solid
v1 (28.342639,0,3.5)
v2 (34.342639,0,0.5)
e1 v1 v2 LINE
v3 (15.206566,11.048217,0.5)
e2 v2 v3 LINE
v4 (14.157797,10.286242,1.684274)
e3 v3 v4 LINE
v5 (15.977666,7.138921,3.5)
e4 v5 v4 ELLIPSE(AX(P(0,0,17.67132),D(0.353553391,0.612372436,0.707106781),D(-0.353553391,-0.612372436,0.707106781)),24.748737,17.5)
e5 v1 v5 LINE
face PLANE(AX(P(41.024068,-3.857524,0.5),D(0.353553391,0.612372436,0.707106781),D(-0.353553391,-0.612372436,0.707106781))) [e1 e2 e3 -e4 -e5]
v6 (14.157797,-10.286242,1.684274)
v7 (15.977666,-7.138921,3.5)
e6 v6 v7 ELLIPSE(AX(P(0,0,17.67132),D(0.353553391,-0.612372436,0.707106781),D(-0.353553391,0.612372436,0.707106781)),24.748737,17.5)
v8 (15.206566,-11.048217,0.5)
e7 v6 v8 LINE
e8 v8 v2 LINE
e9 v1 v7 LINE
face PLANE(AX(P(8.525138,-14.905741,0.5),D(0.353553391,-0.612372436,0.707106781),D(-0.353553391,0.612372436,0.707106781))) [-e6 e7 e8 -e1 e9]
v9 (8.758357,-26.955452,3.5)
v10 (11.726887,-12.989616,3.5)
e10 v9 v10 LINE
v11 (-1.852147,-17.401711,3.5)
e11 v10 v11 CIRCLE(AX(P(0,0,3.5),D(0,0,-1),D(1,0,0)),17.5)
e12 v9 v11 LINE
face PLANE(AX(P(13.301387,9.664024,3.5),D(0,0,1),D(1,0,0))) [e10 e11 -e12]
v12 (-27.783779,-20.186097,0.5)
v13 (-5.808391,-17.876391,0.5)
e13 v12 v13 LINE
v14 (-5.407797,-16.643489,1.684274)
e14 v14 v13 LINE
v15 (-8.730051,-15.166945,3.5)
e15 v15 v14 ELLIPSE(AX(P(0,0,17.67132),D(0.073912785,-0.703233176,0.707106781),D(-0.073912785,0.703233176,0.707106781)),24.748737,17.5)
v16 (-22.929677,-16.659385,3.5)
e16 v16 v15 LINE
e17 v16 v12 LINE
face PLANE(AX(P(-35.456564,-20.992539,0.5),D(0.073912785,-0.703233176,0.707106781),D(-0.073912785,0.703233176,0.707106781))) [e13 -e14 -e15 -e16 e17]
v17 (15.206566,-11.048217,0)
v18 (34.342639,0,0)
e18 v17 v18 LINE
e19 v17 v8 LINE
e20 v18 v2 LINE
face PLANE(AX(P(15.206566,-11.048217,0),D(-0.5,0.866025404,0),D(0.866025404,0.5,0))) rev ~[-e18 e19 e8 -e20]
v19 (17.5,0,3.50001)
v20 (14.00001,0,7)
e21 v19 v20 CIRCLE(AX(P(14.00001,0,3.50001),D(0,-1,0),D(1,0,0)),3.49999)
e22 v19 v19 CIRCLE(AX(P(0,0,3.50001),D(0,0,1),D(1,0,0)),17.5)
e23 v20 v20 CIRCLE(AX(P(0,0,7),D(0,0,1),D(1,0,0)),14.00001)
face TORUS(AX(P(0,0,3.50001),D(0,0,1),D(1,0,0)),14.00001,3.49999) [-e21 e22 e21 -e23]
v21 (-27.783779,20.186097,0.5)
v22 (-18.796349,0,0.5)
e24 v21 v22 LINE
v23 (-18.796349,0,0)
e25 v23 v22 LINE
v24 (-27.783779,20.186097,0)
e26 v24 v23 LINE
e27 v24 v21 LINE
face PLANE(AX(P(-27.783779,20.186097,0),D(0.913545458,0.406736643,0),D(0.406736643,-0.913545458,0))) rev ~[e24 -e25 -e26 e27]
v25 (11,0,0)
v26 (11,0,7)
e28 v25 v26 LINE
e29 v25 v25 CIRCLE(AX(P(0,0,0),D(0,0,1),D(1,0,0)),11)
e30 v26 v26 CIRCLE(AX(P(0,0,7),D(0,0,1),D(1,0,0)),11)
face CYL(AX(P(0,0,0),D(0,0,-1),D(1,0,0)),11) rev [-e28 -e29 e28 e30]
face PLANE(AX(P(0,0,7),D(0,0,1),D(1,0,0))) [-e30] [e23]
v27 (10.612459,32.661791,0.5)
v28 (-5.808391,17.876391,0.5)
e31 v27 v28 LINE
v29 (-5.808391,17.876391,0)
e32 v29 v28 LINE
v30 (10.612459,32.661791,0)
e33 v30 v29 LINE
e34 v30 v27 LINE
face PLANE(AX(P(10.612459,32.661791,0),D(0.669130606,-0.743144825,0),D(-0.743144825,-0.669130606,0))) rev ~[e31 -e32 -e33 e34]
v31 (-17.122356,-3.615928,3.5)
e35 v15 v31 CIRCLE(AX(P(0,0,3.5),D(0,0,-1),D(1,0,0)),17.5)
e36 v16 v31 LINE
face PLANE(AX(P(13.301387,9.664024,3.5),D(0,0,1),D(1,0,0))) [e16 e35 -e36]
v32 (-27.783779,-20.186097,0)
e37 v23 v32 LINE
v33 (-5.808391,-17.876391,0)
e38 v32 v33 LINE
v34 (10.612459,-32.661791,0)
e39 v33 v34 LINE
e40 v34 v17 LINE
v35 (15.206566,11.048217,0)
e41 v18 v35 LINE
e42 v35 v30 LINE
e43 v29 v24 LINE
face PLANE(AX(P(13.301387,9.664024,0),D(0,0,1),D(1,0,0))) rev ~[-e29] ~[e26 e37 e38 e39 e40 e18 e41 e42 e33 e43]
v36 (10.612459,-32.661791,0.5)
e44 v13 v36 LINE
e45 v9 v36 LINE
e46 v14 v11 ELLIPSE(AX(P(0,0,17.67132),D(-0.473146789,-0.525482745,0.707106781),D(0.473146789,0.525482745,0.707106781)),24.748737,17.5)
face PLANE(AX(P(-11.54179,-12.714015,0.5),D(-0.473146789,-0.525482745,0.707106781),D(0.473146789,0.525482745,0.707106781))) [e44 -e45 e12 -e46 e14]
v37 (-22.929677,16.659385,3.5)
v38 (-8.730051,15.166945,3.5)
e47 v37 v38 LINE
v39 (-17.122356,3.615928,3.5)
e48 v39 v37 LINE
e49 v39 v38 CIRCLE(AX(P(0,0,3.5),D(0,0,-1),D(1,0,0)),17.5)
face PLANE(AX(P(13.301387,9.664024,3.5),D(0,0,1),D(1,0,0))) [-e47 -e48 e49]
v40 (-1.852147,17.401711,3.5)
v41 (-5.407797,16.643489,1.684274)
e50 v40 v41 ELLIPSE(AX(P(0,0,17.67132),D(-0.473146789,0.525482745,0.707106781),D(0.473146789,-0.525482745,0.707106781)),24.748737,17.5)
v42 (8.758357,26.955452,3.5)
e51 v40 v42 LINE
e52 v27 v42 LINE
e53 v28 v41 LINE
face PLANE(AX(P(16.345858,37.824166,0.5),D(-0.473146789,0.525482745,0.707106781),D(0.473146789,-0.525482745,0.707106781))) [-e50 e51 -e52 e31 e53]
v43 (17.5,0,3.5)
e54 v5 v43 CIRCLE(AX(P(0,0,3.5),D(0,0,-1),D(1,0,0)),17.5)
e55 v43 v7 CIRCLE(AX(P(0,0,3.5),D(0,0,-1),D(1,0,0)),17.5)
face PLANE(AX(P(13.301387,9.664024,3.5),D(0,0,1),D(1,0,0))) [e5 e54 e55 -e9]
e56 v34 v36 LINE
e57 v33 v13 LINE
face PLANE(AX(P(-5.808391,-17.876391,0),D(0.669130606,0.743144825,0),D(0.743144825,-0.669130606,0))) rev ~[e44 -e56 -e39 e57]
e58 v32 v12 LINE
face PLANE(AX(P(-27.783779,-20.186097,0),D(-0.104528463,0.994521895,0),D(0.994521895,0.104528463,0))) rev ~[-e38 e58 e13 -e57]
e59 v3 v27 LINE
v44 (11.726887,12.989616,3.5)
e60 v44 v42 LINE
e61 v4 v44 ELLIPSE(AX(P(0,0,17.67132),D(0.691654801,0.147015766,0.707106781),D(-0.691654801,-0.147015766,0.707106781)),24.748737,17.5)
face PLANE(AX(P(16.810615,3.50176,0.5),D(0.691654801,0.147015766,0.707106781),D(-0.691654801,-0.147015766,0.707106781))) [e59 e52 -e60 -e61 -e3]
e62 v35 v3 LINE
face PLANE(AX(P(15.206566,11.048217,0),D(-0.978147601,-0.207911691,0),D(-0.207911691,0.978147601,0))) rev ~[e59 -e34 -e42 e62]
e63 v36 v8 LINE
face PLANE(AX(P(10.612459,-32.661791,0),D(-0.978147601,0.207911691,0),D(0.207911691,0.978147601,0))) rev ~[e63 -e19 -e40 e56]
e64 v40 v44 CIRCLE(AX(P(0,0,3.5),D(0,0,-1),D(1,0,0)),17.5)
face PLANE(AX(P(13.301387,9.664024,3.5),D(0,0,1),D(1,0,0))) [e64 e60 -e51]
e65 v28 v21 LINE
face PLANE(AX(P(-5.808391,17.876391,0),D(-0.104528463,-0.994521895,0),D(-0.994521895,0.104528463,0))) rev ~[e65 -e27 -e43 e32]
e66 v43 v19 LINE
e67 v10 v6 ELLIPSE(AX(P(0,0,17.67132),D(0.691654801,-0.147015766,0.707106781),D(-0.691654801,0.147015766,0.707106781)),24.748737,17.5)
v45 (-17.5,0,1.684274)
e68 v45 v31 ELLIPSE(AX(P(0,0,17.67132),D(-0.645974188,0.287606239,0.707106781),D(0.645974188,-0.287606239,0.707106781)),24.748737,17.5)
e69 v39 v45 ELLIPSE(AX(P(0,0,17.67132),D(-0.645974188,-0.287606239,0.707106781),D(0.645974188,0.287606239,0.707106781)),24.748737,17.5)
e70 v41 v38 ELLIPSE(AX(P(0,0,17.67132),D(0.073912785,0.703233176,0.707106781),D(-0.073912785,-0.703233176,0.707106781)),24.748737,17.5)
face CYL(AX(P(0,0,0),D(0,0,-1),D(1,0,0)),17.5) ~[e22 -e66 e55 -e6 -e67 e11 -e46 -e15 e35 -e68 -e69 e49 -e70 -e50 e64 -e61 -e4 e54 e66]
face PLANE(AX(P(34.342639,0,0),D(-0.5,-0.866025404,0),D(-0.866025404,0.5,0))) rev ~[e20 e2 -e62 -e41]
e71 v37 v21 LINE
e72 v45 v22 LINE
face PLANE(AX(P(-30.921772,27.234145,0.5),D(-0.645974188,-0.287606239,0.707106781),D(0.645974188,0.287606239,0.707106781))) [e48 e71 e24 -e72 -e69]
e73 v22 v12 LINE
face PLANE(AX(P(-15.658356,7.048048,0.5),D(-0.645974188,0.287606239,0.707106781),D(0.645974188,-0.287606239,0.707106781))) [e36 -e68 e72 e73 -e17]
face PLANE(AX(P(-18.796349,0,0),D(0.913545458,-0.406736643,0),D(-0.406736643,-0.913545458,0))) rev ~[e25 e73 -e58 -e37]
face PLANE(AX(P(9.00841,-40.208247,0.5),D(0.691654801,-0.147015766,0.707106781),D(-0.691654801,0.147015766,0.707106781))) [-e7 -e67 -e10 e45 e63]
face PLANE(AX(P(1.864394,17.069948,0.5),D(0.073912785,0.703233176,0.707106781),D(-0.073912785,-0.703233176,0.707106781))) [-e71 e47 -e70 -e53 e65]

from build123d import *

# Parameters (mm, degrees)
F0_R          = 17.5
F0_R_2        = 11
F1_DEPTH      = 7
F3_DEPTH      = 3.5
F4_T4_DEPTH   = 37.5265318242
F4_T9_DEPTH   = 37.5265318242
F4_T14_DEPTH  = 37.5265318242
F4_T19_DEPTH  = 37.5265318242
F4_T24_DEPTH  = 37.5265318242
F4_T29_DEPTH  = 37.5265318242
F4_T34_DEPTH  = 37.5265318242
F4_T39_DEPTH  = 37.5265318242
F4_T44_DEPTH  = 37.5265318242
F4_T49_DEPTH  = 37.5265318242
F4_T55_DEPTH  = 37.5265318242
F4_S57_R      = 17.5
F4_T58_DEPTH  = 21
F4_T61_DEPTH  = 37.5265318242
F4_S63_R      = 17.5
F4_T64_DEPTH  = 22
F4_T70_DEPTH  = 37.5265318242
F4_S72_R      = 17.5
F4_T73_DEPTH  = 21
F4_T76_DEPTH  = 37.5265318242
F4_S78_R      = 17.5
F4_T79_DEPTH  = 22
F4_T85_DEPTH  = 37.5265318242
F4_S87_R      = 17.5
F4_T88_DEPTH  = 21
F4_T91_DEPTH  = 37.5265318242
F4_S93_R      = 17.5
F4_T94_DEPTH  = 22
F4_T100_DEPTH = 37.5265318242
F4_S102_R     = 17.5
F4_T103_DEPTH = 21
F4_T106_DEPTH = 37.5265318242
F4_S108_R     = 17.5
F4_T109_DEPTH = 21
F4_T115_DEPTH = 37.5265318242
F4_S117_R     = 17.5
F4_T118_DEPTH = 21
F4_T121_DEPTH = 37.5265318242
F4_S123_R     = 17.5
F4_T124_DEPTH = 22
F5_R          = 3.49999


# Not quite as in the source:
# - a fillet or chamfer that OpenCascade refuses, or shapes differently, is made with other operations: its cross-section is extruded or revolved along the edge and cut away or added
# - a fillet or chamfer is up to 0.001 mm smaller than in the source, because OpenCascade refuses the exact size


with BuildPart() as f1:
    # F0 (on Top) → F1 (new body)
    with BuildSketch(Plane.XY):
        Circle(F0_R)
        Circle(F0_R_2, mode=Mode.SUBTRACT)
    extrude(amount=F1_DEPTH)

    # F2 (on Top) → F3 (join)
    with BuildSketch(Plane.XY):
        Polygon((15.2065660609, 11.0482169482), (11.0207545101, 13.4648963738), (11.0207545101, 8.0070468423), (16.211477872, 6.3204785843), align=None)
        Polygon((11.0207545101, 8.0070468423), (11.0207545101, 13.4648963738), (15.2065660609, 11.0482169482), (10.6124591285, 32.6617907487), (-5.8083913831, 17.8763905373), (-1.0015101774, 17.3711669641), (-4.2095536412, 12.9556739404), align=None)
        Polygon((16.211477872, 6.3204785843), (11.0207545101, 8.0070468423), (11.0207545101, -8.0070468423), (16.211477872, -6.3204785843), (15.2065660609, -11.0482169482), (34.3426391482, 0), (15.2065660609, 11.0482169482), align=None)
        Polygon((16.211477872, -6.3204785843), (11.0207545101, -8.0070468423), (11.0207545101, -13.4648963738), (15.2065660609, -11.0482169482), align=None)
        Polygon((11.0207545101, -13.4648963738), (11.0207545101, -8.0070468423), (-4.2095536412, -12.9556739404), (-1.0015101774, -17.3711669641), (-5.8083913831, -17.8763905373), (10.6124591285, -32.6617907487), (15.2065660609, -11.0482169482), align=None)
        Polygon((-13.6224017379, 0), (-4.2095536412, 12.9556739404), (-9.4002770031, 14.6422421984), (-5.8083913831, 17.8763905373), (-27.7837787026, 20.1860968161), (-18.7963493557, 0), (-16.8304452017, 4.4154930237), align=None)
        Polygon((-9.4002770031, 14.6422421984), (-4.2095536412, 12.9556739404), (-1.0015101774, 17.3711669641), (-5.8083913831, 17.8763905373), align=None)
        Polygon((-9.4002770031, -14.6422421984), (-4.2095536412, -12.9556739404), (-13.6224017379, 0), (-16.8304452017, -4.4154930237), (-18.7963493557, 0), (-27.7837787026, -20.1860968161), (-5.8083913831, -17.8763905373), align=None)
        Polygon((-1.0015101774, -17.3711669641), (-4.2095536412, -12.9556739404), (-9.4002770031, -14.6422421984), (-5.8083913831, -17.8763905373), align=None)
        Polygon((-16.8304452017, -4.4154930237), (-13.6224017379, 0), (-16.8304452017, 4.4154930237), (-18.7963493557, 0), align=None)
    extrude(amount=F3_DEPTH)

    # F4: chamfer of 3 on 10 edges, made by hand


with BuildPart() as f4_tool2:
    # F4_s3 → F4_t4 (new body)
    with BuildSketch(Plane(origin=(0.0145298929, -0.0683577716, 0), x_dir=(0, 0, 1), z_dir=(-0.2079116908, 0.9781476007, 0))):
        Polygon((0.5, 17.1713195741), (3.5, 14.1713195741), (3.5, 17.1713195741), align=None)
    extrude(amount=F4_T4_DEPTH)

    split(bisect_by=Plane(origin=(8.5856597871, 14.8707989677, 0), x_dir=(0, 0, 1), z_dir=(0.5, 0.8660254038, 0)), keep=Keep.TOP)


with BuildPart() as f1_1:
    add(f1.part)

    # F4_t1: cut F4_tool2
    add(f4_tool2.part, mode=Mode.SUBTRACT)


with BuildPart() as f4_tool7:
    # F4_s8 → F4_t9 (new body)
    with BuildSketch(Plane(origin=(32.4384077554, -18.7283234496, 0), x_dir=(0, 0, 1), z_dir=(-0.8660254038, 0.5, 0))):
        Polygon((0.5, 17.1713195741), (3.5, 14.1713195741), (3.5, 17.1713195741), align=None)
    extrude(amount=F4_T9_DEPTH)

    split(bisect_by=Plane(origin=(16.7960850429, 3.5701180862, 0), x_dir=(0, 0, 1), z_dir=(0.9781476007, 0.2079116908, 0)), keep=Keep.TOP)


with BuildPart() as f1_2:
    add(f1_1.part)

    # F4_t6: cut F4_tool7
    add(f4_tool7.part, mode=Mode.SUBTRACT)


with BuildPart() as f4_tool12:
    # F4_s13 → F4_t14 (new body)
    with BuildSketch(Plane(origin=(-0.0605221203, -0.0349424625, 0), x_dir=(0, 0, 1), z_dir=(0.8660254038, 0.5, 0))):
        Polygon((0.5, 17.1713195741), (3.5, 14.1713195741), (3.5, 17.1713195741), align=None)
    extrude(amount=F4_T14_DEPTH)

    split(bisect_by=Plane(origin=(16.7960850429, -3.5701180862, 0), x_dir=(0, 0, 1), z_dir=(0.9781476007, -0.2079116908, 0)), keep=Keep.TOP)


with BuildPart() as f1_3:
    add(f1_2.part)

    # F4_t11: cut F4_tool12
    add(f4_tool12.part, mode=Mode.SUBTRACT)


with BuildPart() as f4_tool17:
    # F4_s18 → F4_t19 (new body)
    with BuildSketch(Plane(origin=(-7.7876747892, -36.6381292961, 0), x_dir=(0, 0, 1), z_dir=(0.2079116908, 0.9781476007, 0))):
        Polygon((0.5, 17.1713195741), (3.5, 14.1713195741), (3.5, 17.1713195741), align=None)
    extrude(amount=F4_T19_DEPTH)

    split(bisect_by=Plane(origin=(8.5856597871, -14.8707989677, 0), x_dir=(0, 0, 1), z_dir=(0.5, -0.8660254038, 0)), keep=Keep.TOP)


with BuildPart() as f1_4:
    add(f1_3.part)

    # F4_t16: cut F4_tool17
    add(f4_tool17.part, mode=Mode.SUBTRACT)


with BuildPart() as f4_tool22:
    # F4_s23 → F4_t24 (new body)
    with BuildSketch(Plane(origin=(-0.0519346203, 0.0467621422, 0), x_dir=(0, 0, 1), z_dir=(0.7431448255, -0.6691306064, 0))):
        Polygon((0.5, 17.1713195741), (3.5, 14.1713195741), (3.5, 17.1713195741), align=None)
    extrude(amount=F4_T24_DEPTH)

    split(bisect_by=Plane(origin=(1.7948916474, -17.0772532888, 0), x_dir=(0, 0, 1), z_dir=(0.1045284633, -0.9945218954, 0)), keep=Keep.TOP)


with BuildPart() as f1_5:
    add(f1_4.part)

    # F4_t21: cut F4_tool22
    add(f4_tool22.part, mode=Mode.SUBTRACT)


with BuildPart() as f4_tool27:
    # F4_s28 → F4_t29 (new body)
    with BuildSketch(Plane(origin=(-37.2514554684, -3.9152857395, 0), x_dir=(0, 0, 1), z_dir=(0.9945218954, 0.1045284633, 0))):
        Polygon((0.5, 17.1713195741), (3.5, 14.1713195741), (3.5, 17.1713195741), align=None)
    extrude(amount=F4_T29_DEPTH)

    split(bisect_by=Plane(origin=(-11.4898554786, -12.7607772881, 0), x_dir=(0, 0, 1), z_dir=(-0.6691306064, -0.7431448255, 0)), keep=Keep.TOP)


with BuildPart() as f1_6:
    add(f1_5.part)

    # F4_t26: cut F4_tool27
    add(f4_tool27.part, mode=Mode.SUBTRACT)


with BuildPart() as f4_tool32:
    # F4_s33 → F4_t34 (new body)
    with BuildSketch(Plane(origin=(0.0284247598, 0.0638430557, 0), x_dir=(0, 0, 1), z_dir=(-0.4067366431, -0.9135454576, 0))):
        Polygon((0.5, 17.1713195741), (3.5, 14.1713195741), (3.5, 17.1713195741), align=None)
    extrude(amount=F4_T34_DEPTH)

    split(bisect_by=Plane(origin=(-15.6867809987, -6.9842048808, 0), x_dir=(0, 0, 1), z_dir=(-0.9135454576, -0.4067366431, 0)), keep=Keep.TOP)


with BuildPart() as f1_7:
    add(f1_6.part)

    # F4_t31: cut F4_tool32
    add(f4_tool32.part, mode=Mode.SUBTRACT)


with BuildPart() as f4_tool37:
    # F4_s38 → F4_t39 (new body)
    with BuildSketch(Plane(origin=(-15.2349908207, 34.2183496334, 0), x_dir=(0, 0, 1), z_dir=(0.4067366431, -0.9135454576, 0))):
        Polygon((0.5, 17.1713195741), (3.5, 14.1713195741), (3.5, 17.1713195741), align=None)
    extrude(amount=F4_T39_DEPTH)

    split(bisect_by=Plane(origin=(-15.6867809987, 6.9842048808, 0), x_dir=(0, 0, 1), z_dir=(-0.9135454576, 0.4067366431, 0)), keep=Keep.TOP)


with BuildPart() as f1_8:
    add(f1_7.part)

    # F4_t36: cut F4_tool37
    add(f4_tool37.part, mode=Mode.SUBTRACT)


with BuildPart() as f4_tool42:
    # F4_s43 → F4_t44 (new body)
    with BuildSketch(Plane(origin=(0.069502088, -0.0073049638, 0), x_dir=(0, 0, 1), z_dir=(-0.9945218954, 0.1045284633, 0))):
        Polygon((0.5, 17.1713195741), (3.5, 14.1713195741), (3.5, 17.1713195741), align=None)
    extrude(amount=F4_T44_DEPTH)

    split(bisect_by=Plane(origin=(-11.4898554786, 12.7607772881, 0), x_dir=(0, 0, 1), z_dir=(-0.6691306064, 0.7431448255, 0)), keep=Keep.TOP)


with BuildPart() as f1_9:
    add(f1_8.part)

    # F4_t41: cut F4_tool42
    add(f4_tool42.part, mode=Mode.SUBTRACT)


with BuildPart() as f4_tool47:
    # F4_s48 → F4_t49 (new body)
    with BuildSketch(Plane(origin=(27.8357133229, 25.0633888519, 0), x_dir=(0, 0, 1), z_dir=(-0.7431448255, -0.6691306064, 0))):
        Polygon((0.5, 17.1713195741), (3.5, 14.1713195741), (3.5, 17.1713195741), align=None)
    extrude(amount=F4_T49_DEPTH)

    split(bisect_by=Plane(origin=(1.7948916474, 17.0772532888, 0), x_dir=(0, 0, 1), z_dir=(0.1045284633, 0.9945218954, 0)), keep=Keep.TOP)


with BuildPart() as f1_10:
    add(f1_9.part)

    # F4_t46: cut F4_tool47
    add(f4_tool47.part, mode=Mode.SUBTRACT)


with BuildPart() as f4_tool53:
    # F4_s54 → F4_t55 (new body)
    with BuildSketch(Plane(origin=(0.0145298929, -0.0683577716, 0), x_dir=(0, 0, 1), z_dir=(-0.2079116908, 0.9781476007, 0))):
        Polygon((0.5, 17.1713195741), (3.5, 14.1713195741), (3.5, 17.1713195741), align=None)
    extrude(amount=F4_T55_DEPTH)

    split(bisect_by=Plane(origin=(8.5856597871, 14.8707989677, 0), x_dir=(0, 0, 1), z_dir=(-0.5, -0.8660254038, 0)), keep=Keep.TOP)

    # F4_s57 → F4_t58 (cut, symmetric)
    with BuildSketch(Plane.XY.offset(2)):
        Circle(F4_S57_R)
    extrude(amount=F4_T58_DEPTH, both=True, mode=Mode.SUBTRACT)


with BuildPart() as f4_tool59:
    # F4_s60 → F4_t61 (new body)
    with BuildSketch(Plane(origin=(32.4384077554, -18.7283234496, 0), x_dir=(0, 0, 1), z_dir=(-0.8660254038, 0.5, 0))):
        Polygon((0.5, 17.1713195741), (3.5, 14.1713195741), (3.5, 17.1713195741), align=None)
    extrude(amount=F4_T61_DEPTH)

    split(bisect_by=Plane(origin=(16.7960850429, 3.5701180862, 0), x_dir=(0, 0, 1), z_dir=(-0.9781476007, -0.2079116908, 0)), keep=Keep.TOP)

    # F4_s63 → F4_t64 (cut, symmetric)
    with BuildSketch(Plane.XY.offset(2)):
        Circle(F4_S63_R)
    extrude(amount=F4_T64_DEPTH, both=True, mode=Mode.SUBTRACT)


with BuildPart() as f4_tool53_1:
    add(f4_tool53.part)

    # F4_t65: intersect F4_tool59
    add(f4_tool59.part, mode=Mode.INTERSECT)


with BuildPart() as f1_11:
    add(f1_10.part)

    # F4_t51: cut F4_tool53
    add(f4_tool53_1.part, mode=Mode.SUBTRACT)


with BuildPart() as f4_tool68:
    # F4_s69 → F4_t70 (new body)
    with BuildSketch(Plane(origin=(-7.7876747892, -36.6381292961, 0), x_dir=(0, 0, 1), z_dir=(0.2079116908, 0.9781476007, 0))):
        Polygon((0.5, 17.1713195741), (3.5, 14.1713195741), (3.5, 17.1713195741), align=None)
    extrude(amount=F4_T70_DEPTH)

    split(bisect_by=Plane(origin=(8.5856597871, -14.8707989677, 0), x_dir=(0, 0, 1), z_dir=(-0.5, 0.8660254038, 0)), keep=Keep.TOP)

    # F4_s72 → F4_t73 (cut, symmetric)
    with BuildSketch(Plane.XY.offset(2)):
        Circle(F4_S72_R)
    extrude(amount=F4_T73_DEPTH, both=True, mode=Mode.SUBTRACT)


with BuildPart() as f4_tool74:
    # F4_s75 → F4_t76 (new body)
    with BuildSketch(Plane(origin=(-0.0605221203, -0.0349424625, 0), x_dir=(0, 0, 1), z_dir=(0.8660254038, 0.5, 0))):
        Polygon((0.5, 17.1713195741), (3.5, 14.1713195741), (3.5, 17.1713195741), align=None)
    extrude(amount=F4_T76_DEPTH)

    split(bisect_by=Plane(origin=(16.7960850429, -3.5701180862, 0), x_dir=(0, 0, 1), z_dir=(-0.9781476007, 0.2079116908, 0)), keep=Keep.TOP)

    # F4_s78 → F4_t79 (cut, symmetric)
    with BuildSketch(Plane.XY.offset(2)):
        Circle(F4_S78_R)
    extrude(amount=F4_T79_DEPTH, both=True, mode=Mode.SUBTRACT)


with BuildPart() as f4_tool68_1:
    add(f4_tool68.part)

    # F4_t80: intersect F4_tool74
    add(f4_tool74.part, mode=Mode.INTERSECT)


with BuildPart() as f1_12:
    add(f1_11.part)

    # F4_t66: cut F4_tool68
    add(f4_tool68_1.part, mode=Mode.SUBTRACT)


with BuildPart() as f4_tool83:
    # F4_s84 → F4_t85 (new body)
    with BuildSketch(Plane(origin=(-37.2514554684, -3.9152857395, 0), x_dir=(0, 0, 1), z_dir=(0.9945218954, 0.1045284633, 0))):
        Polygon((0.5, 17.1713195741), (3.5, 14.1713195741), (3.5, 17.1713195741), align=None)
    extrude(amount=F4_T85_DEPTH)

    split(bisect_by=Plane(origin=(-11.4898554786, -12.7607772881, 0), x_dir=(0, 0, 1), z_dir=(0.6691306064, 0.7431448255, 0)), keep=Keep.TOP)

    # F4_s87 → F4_t88 (cut, symmetric)
    with BuildSketch(Plane.XY.offset(2)):
        Circle(F4_S87_R)
    extrude(amount=F4_T88_DEPTH, both=True, mode=Mode.SUBTRACT)


with BuildPart() as f4_tool89:
    # F4_s90 → F4_t91 (new body)
    with BuildSketch(Plane(origin=(-0.0519346203, 0.0467621422, 0), x_dir=(0, 0, 1), z_dir=(0.7431448255, -0.6691306064, 0))):
        Polygon((0.5, 17.1713195741), (3.5, 14.1713195741), (3.5, 17.1713195741), align=None)
    extrude(amount=F4_T91_DEPTH)

    split(bisect_by=Plane(origin=(1.7948916474, -17.0772532888, 0), x_dir=(0, 0, 1), z_dir=(-0.1045284633, 0.9945218954, 0)), keep=Keep.TOP)

    # F4_s93 → F4_t94 (cut, symmetric)
    with BuildSketch(Plane.XY.offset(2)):
        Circle(F4_S93_R)
    extrude(amount=F4_T94_DEPTH, both=True, mode=Mode.SUBTRACT)


with BuildPart() as f4_tool83_1:
    add(f4_tool83.part)

    # F4_t95: intersect F4_tool89
    add(f4_tool89.part, mode=Mode.INTERSECT)


with BuildPart() as f1_13:
    add(f1_12.part)

    # F4_t81: cut F4_tool83
    add(f4_tool83_1.part, mode=Mode.SUBTRACT)


with BuildPart() as f4_tool98:
    # F4_s99 → F4_t100 (new body)
    with BuildSketch(Plane(origin=(-15.2349908207, 34.2183496334, 0), x_dir=(0, 0, 1), z_dir=(0.4067366431, -0.9135454576, 0))):
        Polygon((0.5, 17.1713195741), (3.5, 14.1713195741), (3.5, 17.1713195741), align=None)
    extrude(amount=F4_T100_DEPTH)

    split(bisect_by=Plane(origin=(-15.6867809987, 6.9842048808, 0), x_dir=(0, 0, 1), z_dir=(0.9135454576, -0.4067366431, 0)), keep=Keep.TOP)

    # F4_s102 → F4_t103 (cut, symmetric)
    with BuildSketch(Plane.XY.offset(2)):
        Circle(F4_S102_R)
    extrude(amount=F4_T103_DEPTH, both=True, mode=Mode.SUBTRACT)


with BuildPart() as f4_tool104:
    # F4_s105 → F4_t106 (new body)
    with BuildSketch(Plane(origin=(0.0284247598, 0.0638430557, 0), x_dir=(0, 0, 1), z_dir=(-0.4067366431, -0.9135454576, 0))):
        Polygon((0.5, 17.1713195741), (3.5, 14.1713195741), (3.5, 17.1713195741), align=None)
    extrude(amount=F4_T106_DEPTH)

    split(bisect_by=Plane(origin=(-15.6867809987, -6.9842048808, 0), x_dir=(0, 0, 1), z_dir=(0.9135454576, 0.4067366431, 0)), keep=Keep.TOP)

    # F4_s108 → F4_t109 (cut, symmetric)
    with BuildSketch(Plane.XY.offset(2)):
        Circle(F4_S108_R)
    extrude(amount=F4_T109_DEPTH, both=True, mode=Mode.SUBTRACT)


with BuildPart() as f4_tool98_1:
    add(f4_tool98.part)

    # F4_t110: intersect F4_tool104
    add(f4_tool104.part, mode=Mode.INTERSECT)


with BuildPart() as f1_14:
    add(f1_13.part)

    # F4_t96: cut F4_tool98
    add(f4_tool98_1.part, mode=Mode.SUBTRACT)


with BuildPart() as f4_tool113:
    # F4_s114 → F4_t115 (new body)
    with BuildSketch(Plane(origin=(0.069502088, -0.0073049638, 0), x_dir=(0, 0, 1), z_dir=(-0.9945218954, 0.1045284633, 0))):
        Polygon((0.5, 17.1713195741), (3.5, 14.1713195741), (3.5, 17.1713195741), align=None)
    extrude(amount=F4_T115_DEPTH)

    split(bisect_by=Plane(origin=(-11.4898554786, 12.7607772881, 0), x_dir=(0, 0, 1), z_dir=(0.6691306064, -0.7431448255, 0)), keep=Keep.TOP)

    # F4_s117 → F4_t118 (cut, symmetric)
    with BuildSketch(Plane.XY.offset(2)):
        Circle(F4_S117_R)
    extrude(amount=F4_T118_DEPTH, both=True, mode=Mode.SUBTRACT)


with BuildPart() as f4_tool119:
    # F4_s120 → F4_t121 (new body)
    with BuildSketch(Plane(origin=(27.8357133229, 25.0633888519, 0), x_dir=(0, 0, 1), z_dir=(-0.7431448255, -0.6691306064, 0))):
        Polygon((0.5, 17.1713195741), (3.5, 14.1713195741), (3.5, 17.1713195741), align=None)
    extrude(amount=F4_T121_DEPTH)

    split(bisect_by=Plane(origin=(1.7948916474, 17.0772532888, 0), x_dir=(0, 0, 1), z_dir=(-0.1045284633, -0.9945218954, 0)), keep=Keep.TOP)

    # F4_s123 → F4_t124 (cut, symmetric)
    with BuildSketch(Plane.XY.offset(2)):
        Circle(F4_S123_R)
    extrude(amount=F4_T124_DEPTH, both=True, mode=Mode.SUBTRACT)


with BuildPart() as f4_tool113_1:
    add(f4_tool113.part)

    # F4_t125: intersect F4_tool119
    add(f4_tool119.part, mode=Mode.INTERSECT)


with BuildPart() as f1_15:
    add(f1_14.part)

    # F4_t111: cut F4_tool113
    add(f4_tool113_1.part, mode=Mode.SUBTRACT)

    # F5 (radius 3.5 in the source; OpenCascade refuses exactly that, so slightly less here)
    f5_edges = [f1_15.edges().sort_by_distance(p)[0] for p in [
        (-17.5, 0, 7),
    ]]
    fillet(f5_edges, radius=F5_R)


solid = f1_15.part
